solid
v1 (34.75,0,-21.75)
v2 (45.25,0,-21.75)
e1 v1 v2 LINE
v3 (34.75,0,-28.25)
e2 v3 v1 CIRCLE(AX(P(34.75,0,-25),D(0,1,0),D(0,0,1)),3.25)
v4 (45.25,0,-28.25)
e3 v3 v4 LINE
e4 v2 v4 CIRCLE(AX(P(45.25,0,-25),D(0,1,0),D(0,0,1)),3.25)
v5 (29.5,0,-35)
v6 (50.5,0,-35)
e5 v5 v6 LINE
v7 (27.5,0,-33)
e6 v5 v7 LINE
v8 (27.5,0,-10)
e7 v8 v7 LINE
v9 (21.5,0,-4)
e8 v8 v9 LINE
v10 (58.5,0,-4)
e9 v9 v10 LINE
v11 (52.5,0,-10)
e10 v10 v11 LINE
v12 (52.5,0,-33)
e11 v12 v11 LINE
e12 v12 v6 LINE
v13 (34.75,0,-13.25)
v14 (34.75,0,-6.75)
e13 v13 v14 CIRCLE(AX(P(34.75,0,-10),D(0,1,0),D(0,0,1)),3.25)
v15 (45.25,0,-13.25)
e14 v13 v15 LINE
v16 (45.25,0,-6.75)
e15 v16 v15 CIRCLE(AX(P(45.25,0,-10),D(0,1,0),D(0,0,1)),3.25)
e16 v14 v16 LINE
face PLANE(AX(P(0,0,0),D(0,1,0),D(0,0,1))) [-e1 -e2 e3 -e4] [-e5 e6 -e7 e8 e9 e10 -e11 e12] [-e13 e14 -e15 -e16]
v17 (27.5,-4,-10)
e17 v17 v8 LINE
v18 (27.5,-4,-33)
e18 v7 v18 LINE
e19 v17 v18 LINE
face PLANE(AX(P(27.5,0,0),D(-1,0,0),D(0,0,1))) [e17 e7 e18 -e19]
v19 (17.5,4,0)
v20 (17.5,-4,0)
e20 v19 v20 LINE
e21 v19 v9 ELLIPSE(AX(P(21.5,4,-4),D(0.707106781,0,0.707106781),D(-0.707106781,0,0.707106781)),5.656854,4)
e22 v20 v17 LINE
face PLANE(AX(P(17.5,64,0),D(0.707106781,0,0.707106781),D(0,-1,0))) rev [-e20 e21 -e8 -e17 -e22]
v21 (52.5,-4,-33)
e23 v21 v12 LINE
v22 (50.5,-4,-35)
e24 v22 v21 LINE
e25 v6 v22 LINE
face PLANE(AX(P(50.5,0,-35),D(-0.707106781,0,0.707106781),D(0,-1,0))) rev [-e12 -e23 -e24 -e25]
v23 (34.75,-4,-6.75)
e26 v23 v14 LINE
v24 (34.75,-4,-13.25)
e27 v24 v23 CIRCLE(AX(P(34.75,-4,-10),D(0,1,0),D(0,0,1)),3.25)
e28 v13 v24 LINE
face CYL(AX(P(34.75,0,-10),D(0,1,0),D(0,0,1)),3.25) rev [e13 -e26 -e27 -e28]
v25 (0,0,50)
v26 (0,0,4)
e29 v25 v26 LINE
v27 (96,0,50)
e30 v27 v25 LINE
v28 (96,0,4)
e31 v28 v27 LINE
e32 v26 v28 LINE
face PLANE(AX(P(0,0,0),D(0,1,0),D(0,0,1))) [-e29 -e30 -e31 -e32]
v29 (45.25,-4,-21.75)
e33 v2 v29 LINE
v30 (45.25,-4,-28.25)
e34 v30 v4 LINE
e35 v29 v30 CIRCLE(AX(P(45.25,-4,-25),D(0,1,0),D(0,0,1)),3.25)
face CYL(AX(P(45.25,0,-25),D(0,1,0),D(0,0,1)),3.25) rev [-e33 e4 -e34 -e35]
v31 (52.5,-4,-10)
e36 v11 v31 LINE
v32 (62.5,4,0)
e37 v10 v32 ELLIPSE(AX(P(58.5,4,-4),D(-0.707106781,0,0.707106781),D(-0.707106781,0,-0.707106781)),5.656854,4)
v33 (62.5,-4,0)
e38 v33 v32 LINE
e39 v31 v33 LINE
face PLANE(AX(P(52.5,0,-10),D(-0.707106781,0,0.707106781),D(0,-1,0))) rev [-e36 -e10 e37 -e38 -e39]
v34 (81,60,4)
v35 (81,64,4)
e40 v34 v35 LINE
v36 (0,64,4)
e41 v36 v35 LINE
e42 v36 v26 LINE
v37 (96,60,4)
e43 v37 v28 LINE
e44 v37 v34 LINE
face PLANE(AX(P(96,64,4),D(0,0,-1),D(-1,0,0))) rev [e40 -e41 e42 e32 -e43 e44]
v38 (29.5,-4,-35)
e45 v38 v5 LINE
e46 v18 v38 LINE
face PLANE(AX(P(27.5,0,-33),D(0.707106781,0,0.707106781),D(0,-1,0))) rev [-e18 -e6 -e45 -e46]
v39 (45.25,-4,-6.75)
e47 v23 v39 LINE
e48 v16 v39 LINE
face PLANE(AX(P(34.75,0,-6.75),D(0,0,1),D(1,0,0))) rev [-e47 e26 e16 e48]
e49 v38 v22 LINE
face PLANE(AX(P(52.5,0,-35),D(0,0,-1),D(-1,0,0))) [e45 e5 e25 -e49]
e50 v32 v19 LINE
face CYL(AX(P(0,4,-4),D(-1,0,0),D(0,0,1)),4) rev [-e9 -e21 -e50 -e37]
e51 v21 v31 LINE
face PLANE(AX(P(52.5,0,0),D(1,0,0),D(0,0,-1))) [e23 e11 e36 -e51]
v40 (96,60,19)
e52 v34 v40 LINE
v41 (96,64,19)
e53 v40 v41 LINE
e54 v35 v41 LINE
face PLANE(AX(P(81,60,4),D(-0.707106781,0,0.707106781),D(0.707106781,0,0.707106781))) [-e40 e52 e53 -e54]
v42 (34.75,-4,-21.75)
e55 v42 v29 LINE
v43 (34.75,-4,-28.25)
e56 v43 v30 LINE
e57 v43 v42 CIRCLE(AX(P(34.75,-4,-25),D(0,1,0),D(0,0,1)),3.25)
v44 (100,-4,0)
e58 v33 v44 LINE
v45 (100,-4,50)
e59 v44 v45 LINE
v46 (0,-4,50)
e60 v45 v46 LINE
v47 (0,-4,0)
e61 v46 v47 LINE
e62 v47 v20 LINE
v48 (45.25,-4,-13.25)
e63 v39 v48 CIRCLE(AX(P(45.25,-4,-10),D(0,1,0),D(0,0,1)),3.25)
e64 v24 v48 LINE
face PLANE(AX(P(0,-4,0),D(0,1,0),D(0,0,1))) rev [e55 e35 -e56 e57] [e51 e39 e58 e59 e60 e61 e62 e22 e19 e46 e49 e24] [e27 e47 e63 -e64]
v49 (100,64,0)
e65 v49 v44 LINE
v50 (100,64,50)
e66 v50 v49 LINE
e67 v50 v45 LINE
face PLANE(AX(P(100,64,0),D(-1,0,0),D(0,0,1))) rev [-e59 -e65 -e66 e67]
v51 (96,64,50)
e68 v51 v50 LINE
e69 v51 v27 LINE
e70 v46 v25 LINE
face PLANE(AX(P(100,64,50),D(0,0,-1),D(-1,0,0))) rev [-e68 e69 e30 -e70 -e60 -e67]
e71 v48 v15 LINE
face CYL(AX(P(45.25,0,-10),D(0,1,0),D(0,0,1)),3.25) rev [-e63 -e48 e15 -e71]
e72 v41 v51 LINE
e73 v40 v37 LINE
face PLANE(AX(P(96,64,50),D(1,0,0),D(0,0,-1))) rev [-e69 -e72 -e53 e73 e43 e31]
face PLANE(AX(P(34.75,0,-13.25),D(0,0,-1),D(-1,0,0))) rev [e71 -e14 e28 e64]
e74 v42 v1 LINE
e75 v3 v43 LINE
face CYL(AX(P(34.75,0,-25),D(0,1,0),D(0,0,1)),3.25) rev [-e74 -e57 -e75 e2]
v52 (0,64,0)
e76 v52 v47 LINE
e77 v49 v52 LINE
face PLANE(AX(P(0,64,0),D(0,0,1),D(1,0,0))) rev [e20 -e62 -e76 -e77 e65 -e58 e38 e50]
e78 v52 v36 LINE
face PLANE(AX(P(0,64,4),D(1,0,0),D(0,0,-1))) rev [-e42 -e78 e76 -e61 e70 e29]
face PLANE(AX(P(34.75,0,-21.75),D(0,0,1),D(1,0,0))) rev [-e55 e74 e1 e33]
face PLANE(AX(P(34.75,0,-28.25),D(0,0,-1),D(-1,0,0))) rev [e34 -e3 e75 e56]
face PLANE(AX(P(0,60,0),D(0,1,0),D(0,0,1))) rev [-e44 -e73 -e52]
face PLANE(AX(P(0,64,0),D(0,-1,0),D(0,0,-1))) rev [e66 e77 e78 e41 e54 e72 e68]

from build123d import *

# Parameters (mm, degrees)
BOSS_EXTRUDE1_DEPTH       = 64
SKETCH2_W                 = 100
SKETCH2_H                 = 50
BOSS_EXTRUDE2_DEPTH       = 4
BOSS_EXTRUDE3_DEPTH       = 4
SKETCH4_W                 = 25
SKETCH4_H                 = 35
BOSS_EXTRUDE4_DEPTH       = 4
CHAMFER1_SIZE             = 10
CHAMFER2_SIZE             = 2
F_6_0MM_START             = -4
F_6_0MM_DOWEL_SLOT1_DEPTH = 4
FILLET1_R                 = 4


# Read off the part's stored shape, not the designer's step: Ø6.0mm Dowel Slot1
with BuildPart() as part:
    # Sketch1 → Boss-Extrude1 (new body)
    with BuildSketch(Plane(origin=(0, 0, 0), x_dir=(1, 0, 0), z_dir=(0, 1, 0))):
        Polygon((0, 0), (100, 0), (100, -50), (96, -50), (96, -4), (0, -4), align=None)
    extrude(amount=BOSS_EXTRUDE1_DEPTH)

    # Sketch2 → Boss-Extrude2 (add)
    with BuildSketch(Plane.XZ):
        with Locations((50, 25)):
            Rectangle(SKETCH2_W, SKETCH2_H)
    extrude(amount=BOSS_EXTRUDE2_DEPTH)

    # Sketch3 → Boss-Extrude3 (add)
    with BuildSketch(Plane(origin=(0, 64, 0), x_dir=(1, 0, 0), z_dir=(0, 1, 0))):
        Polygon((96, -4), (81, -4), (96, -19), align=None)
    extrude(amount=-BOSS_EXTRUDE3_DEPTH)

    # Sketch4 → Boss-Extrude4 (add)
    with BuildSketch(Plane.XZ.offset(4)):
        with Locations((40, -17.5)):
            Rectangle(SKETCH4_W, SKETCH4_H)
    extrude(amount=-BOSS_EXTRUDE4_DEPTH)

    # Chamfer1
    chamfer1_edges = [part.edges().sort_by_distance(p)[0] for p in [
        (52.5, -2, 0),
        (27.5, -2, 0),
    ]]
    chamfer(chamfer1_edges, length=CHAMFER1_SIZE)

    # Chamfer2
    chamfer2_edges = [part.edges().sort_by_distance(p)[0] for p in [
        (52.5, -2, -35),
        (27.5, -2, -35),
    ]]
    chamfer(chamfer2_edges, length=CHAMFER2_SIZE)

    # Ø6.0mm Dowel Slot1 outline → Ø6.0mm Dowel Slot1 (cut)
    with BuildSketch(Plane(origin=(0, 0, 0), x_dir=(1, 0, 0), z_dir=(0, 1, 0)).offset(F_6_0MM_START)):
        with BuildLine():
            Line((34.75, 6.75), (45.25, 6.75))
            ThreePointArc((45.25, 6.75), (48.5, 10), (45.25, 13.25))
            Line((45.25, 13.25), (34.75, 13.25))
            ThreePointArc((34.75, 13.25), (31.5, 10), (34.75, 6.75))
        make_face()
        with BuildLine():
            Line((34.75, 21.75), (45.25, 21.75))
            ThreePointArc((45.25, 21.75), (48.5, 25), (45.25, 28.25))
            Line((45.25, 28.25), (34.75, 28.25))
            ThreePointArc((34.75, 28.25), (31.5, 25), (34.75, 21.75))
        make_face()
    extrude(amount=F_6_0MM_DOWEL_SLOT1_DEPTH, mode=Mode.SUBTRACT)

    # Fillet1
    fillet1_edges = [part.edges().sort_by_distance(p)[0] for p in [
        (40, 0, 0),
    ]]
    fillet(fillet1_edges, radius=FILLET1_R)


solid = part.part
